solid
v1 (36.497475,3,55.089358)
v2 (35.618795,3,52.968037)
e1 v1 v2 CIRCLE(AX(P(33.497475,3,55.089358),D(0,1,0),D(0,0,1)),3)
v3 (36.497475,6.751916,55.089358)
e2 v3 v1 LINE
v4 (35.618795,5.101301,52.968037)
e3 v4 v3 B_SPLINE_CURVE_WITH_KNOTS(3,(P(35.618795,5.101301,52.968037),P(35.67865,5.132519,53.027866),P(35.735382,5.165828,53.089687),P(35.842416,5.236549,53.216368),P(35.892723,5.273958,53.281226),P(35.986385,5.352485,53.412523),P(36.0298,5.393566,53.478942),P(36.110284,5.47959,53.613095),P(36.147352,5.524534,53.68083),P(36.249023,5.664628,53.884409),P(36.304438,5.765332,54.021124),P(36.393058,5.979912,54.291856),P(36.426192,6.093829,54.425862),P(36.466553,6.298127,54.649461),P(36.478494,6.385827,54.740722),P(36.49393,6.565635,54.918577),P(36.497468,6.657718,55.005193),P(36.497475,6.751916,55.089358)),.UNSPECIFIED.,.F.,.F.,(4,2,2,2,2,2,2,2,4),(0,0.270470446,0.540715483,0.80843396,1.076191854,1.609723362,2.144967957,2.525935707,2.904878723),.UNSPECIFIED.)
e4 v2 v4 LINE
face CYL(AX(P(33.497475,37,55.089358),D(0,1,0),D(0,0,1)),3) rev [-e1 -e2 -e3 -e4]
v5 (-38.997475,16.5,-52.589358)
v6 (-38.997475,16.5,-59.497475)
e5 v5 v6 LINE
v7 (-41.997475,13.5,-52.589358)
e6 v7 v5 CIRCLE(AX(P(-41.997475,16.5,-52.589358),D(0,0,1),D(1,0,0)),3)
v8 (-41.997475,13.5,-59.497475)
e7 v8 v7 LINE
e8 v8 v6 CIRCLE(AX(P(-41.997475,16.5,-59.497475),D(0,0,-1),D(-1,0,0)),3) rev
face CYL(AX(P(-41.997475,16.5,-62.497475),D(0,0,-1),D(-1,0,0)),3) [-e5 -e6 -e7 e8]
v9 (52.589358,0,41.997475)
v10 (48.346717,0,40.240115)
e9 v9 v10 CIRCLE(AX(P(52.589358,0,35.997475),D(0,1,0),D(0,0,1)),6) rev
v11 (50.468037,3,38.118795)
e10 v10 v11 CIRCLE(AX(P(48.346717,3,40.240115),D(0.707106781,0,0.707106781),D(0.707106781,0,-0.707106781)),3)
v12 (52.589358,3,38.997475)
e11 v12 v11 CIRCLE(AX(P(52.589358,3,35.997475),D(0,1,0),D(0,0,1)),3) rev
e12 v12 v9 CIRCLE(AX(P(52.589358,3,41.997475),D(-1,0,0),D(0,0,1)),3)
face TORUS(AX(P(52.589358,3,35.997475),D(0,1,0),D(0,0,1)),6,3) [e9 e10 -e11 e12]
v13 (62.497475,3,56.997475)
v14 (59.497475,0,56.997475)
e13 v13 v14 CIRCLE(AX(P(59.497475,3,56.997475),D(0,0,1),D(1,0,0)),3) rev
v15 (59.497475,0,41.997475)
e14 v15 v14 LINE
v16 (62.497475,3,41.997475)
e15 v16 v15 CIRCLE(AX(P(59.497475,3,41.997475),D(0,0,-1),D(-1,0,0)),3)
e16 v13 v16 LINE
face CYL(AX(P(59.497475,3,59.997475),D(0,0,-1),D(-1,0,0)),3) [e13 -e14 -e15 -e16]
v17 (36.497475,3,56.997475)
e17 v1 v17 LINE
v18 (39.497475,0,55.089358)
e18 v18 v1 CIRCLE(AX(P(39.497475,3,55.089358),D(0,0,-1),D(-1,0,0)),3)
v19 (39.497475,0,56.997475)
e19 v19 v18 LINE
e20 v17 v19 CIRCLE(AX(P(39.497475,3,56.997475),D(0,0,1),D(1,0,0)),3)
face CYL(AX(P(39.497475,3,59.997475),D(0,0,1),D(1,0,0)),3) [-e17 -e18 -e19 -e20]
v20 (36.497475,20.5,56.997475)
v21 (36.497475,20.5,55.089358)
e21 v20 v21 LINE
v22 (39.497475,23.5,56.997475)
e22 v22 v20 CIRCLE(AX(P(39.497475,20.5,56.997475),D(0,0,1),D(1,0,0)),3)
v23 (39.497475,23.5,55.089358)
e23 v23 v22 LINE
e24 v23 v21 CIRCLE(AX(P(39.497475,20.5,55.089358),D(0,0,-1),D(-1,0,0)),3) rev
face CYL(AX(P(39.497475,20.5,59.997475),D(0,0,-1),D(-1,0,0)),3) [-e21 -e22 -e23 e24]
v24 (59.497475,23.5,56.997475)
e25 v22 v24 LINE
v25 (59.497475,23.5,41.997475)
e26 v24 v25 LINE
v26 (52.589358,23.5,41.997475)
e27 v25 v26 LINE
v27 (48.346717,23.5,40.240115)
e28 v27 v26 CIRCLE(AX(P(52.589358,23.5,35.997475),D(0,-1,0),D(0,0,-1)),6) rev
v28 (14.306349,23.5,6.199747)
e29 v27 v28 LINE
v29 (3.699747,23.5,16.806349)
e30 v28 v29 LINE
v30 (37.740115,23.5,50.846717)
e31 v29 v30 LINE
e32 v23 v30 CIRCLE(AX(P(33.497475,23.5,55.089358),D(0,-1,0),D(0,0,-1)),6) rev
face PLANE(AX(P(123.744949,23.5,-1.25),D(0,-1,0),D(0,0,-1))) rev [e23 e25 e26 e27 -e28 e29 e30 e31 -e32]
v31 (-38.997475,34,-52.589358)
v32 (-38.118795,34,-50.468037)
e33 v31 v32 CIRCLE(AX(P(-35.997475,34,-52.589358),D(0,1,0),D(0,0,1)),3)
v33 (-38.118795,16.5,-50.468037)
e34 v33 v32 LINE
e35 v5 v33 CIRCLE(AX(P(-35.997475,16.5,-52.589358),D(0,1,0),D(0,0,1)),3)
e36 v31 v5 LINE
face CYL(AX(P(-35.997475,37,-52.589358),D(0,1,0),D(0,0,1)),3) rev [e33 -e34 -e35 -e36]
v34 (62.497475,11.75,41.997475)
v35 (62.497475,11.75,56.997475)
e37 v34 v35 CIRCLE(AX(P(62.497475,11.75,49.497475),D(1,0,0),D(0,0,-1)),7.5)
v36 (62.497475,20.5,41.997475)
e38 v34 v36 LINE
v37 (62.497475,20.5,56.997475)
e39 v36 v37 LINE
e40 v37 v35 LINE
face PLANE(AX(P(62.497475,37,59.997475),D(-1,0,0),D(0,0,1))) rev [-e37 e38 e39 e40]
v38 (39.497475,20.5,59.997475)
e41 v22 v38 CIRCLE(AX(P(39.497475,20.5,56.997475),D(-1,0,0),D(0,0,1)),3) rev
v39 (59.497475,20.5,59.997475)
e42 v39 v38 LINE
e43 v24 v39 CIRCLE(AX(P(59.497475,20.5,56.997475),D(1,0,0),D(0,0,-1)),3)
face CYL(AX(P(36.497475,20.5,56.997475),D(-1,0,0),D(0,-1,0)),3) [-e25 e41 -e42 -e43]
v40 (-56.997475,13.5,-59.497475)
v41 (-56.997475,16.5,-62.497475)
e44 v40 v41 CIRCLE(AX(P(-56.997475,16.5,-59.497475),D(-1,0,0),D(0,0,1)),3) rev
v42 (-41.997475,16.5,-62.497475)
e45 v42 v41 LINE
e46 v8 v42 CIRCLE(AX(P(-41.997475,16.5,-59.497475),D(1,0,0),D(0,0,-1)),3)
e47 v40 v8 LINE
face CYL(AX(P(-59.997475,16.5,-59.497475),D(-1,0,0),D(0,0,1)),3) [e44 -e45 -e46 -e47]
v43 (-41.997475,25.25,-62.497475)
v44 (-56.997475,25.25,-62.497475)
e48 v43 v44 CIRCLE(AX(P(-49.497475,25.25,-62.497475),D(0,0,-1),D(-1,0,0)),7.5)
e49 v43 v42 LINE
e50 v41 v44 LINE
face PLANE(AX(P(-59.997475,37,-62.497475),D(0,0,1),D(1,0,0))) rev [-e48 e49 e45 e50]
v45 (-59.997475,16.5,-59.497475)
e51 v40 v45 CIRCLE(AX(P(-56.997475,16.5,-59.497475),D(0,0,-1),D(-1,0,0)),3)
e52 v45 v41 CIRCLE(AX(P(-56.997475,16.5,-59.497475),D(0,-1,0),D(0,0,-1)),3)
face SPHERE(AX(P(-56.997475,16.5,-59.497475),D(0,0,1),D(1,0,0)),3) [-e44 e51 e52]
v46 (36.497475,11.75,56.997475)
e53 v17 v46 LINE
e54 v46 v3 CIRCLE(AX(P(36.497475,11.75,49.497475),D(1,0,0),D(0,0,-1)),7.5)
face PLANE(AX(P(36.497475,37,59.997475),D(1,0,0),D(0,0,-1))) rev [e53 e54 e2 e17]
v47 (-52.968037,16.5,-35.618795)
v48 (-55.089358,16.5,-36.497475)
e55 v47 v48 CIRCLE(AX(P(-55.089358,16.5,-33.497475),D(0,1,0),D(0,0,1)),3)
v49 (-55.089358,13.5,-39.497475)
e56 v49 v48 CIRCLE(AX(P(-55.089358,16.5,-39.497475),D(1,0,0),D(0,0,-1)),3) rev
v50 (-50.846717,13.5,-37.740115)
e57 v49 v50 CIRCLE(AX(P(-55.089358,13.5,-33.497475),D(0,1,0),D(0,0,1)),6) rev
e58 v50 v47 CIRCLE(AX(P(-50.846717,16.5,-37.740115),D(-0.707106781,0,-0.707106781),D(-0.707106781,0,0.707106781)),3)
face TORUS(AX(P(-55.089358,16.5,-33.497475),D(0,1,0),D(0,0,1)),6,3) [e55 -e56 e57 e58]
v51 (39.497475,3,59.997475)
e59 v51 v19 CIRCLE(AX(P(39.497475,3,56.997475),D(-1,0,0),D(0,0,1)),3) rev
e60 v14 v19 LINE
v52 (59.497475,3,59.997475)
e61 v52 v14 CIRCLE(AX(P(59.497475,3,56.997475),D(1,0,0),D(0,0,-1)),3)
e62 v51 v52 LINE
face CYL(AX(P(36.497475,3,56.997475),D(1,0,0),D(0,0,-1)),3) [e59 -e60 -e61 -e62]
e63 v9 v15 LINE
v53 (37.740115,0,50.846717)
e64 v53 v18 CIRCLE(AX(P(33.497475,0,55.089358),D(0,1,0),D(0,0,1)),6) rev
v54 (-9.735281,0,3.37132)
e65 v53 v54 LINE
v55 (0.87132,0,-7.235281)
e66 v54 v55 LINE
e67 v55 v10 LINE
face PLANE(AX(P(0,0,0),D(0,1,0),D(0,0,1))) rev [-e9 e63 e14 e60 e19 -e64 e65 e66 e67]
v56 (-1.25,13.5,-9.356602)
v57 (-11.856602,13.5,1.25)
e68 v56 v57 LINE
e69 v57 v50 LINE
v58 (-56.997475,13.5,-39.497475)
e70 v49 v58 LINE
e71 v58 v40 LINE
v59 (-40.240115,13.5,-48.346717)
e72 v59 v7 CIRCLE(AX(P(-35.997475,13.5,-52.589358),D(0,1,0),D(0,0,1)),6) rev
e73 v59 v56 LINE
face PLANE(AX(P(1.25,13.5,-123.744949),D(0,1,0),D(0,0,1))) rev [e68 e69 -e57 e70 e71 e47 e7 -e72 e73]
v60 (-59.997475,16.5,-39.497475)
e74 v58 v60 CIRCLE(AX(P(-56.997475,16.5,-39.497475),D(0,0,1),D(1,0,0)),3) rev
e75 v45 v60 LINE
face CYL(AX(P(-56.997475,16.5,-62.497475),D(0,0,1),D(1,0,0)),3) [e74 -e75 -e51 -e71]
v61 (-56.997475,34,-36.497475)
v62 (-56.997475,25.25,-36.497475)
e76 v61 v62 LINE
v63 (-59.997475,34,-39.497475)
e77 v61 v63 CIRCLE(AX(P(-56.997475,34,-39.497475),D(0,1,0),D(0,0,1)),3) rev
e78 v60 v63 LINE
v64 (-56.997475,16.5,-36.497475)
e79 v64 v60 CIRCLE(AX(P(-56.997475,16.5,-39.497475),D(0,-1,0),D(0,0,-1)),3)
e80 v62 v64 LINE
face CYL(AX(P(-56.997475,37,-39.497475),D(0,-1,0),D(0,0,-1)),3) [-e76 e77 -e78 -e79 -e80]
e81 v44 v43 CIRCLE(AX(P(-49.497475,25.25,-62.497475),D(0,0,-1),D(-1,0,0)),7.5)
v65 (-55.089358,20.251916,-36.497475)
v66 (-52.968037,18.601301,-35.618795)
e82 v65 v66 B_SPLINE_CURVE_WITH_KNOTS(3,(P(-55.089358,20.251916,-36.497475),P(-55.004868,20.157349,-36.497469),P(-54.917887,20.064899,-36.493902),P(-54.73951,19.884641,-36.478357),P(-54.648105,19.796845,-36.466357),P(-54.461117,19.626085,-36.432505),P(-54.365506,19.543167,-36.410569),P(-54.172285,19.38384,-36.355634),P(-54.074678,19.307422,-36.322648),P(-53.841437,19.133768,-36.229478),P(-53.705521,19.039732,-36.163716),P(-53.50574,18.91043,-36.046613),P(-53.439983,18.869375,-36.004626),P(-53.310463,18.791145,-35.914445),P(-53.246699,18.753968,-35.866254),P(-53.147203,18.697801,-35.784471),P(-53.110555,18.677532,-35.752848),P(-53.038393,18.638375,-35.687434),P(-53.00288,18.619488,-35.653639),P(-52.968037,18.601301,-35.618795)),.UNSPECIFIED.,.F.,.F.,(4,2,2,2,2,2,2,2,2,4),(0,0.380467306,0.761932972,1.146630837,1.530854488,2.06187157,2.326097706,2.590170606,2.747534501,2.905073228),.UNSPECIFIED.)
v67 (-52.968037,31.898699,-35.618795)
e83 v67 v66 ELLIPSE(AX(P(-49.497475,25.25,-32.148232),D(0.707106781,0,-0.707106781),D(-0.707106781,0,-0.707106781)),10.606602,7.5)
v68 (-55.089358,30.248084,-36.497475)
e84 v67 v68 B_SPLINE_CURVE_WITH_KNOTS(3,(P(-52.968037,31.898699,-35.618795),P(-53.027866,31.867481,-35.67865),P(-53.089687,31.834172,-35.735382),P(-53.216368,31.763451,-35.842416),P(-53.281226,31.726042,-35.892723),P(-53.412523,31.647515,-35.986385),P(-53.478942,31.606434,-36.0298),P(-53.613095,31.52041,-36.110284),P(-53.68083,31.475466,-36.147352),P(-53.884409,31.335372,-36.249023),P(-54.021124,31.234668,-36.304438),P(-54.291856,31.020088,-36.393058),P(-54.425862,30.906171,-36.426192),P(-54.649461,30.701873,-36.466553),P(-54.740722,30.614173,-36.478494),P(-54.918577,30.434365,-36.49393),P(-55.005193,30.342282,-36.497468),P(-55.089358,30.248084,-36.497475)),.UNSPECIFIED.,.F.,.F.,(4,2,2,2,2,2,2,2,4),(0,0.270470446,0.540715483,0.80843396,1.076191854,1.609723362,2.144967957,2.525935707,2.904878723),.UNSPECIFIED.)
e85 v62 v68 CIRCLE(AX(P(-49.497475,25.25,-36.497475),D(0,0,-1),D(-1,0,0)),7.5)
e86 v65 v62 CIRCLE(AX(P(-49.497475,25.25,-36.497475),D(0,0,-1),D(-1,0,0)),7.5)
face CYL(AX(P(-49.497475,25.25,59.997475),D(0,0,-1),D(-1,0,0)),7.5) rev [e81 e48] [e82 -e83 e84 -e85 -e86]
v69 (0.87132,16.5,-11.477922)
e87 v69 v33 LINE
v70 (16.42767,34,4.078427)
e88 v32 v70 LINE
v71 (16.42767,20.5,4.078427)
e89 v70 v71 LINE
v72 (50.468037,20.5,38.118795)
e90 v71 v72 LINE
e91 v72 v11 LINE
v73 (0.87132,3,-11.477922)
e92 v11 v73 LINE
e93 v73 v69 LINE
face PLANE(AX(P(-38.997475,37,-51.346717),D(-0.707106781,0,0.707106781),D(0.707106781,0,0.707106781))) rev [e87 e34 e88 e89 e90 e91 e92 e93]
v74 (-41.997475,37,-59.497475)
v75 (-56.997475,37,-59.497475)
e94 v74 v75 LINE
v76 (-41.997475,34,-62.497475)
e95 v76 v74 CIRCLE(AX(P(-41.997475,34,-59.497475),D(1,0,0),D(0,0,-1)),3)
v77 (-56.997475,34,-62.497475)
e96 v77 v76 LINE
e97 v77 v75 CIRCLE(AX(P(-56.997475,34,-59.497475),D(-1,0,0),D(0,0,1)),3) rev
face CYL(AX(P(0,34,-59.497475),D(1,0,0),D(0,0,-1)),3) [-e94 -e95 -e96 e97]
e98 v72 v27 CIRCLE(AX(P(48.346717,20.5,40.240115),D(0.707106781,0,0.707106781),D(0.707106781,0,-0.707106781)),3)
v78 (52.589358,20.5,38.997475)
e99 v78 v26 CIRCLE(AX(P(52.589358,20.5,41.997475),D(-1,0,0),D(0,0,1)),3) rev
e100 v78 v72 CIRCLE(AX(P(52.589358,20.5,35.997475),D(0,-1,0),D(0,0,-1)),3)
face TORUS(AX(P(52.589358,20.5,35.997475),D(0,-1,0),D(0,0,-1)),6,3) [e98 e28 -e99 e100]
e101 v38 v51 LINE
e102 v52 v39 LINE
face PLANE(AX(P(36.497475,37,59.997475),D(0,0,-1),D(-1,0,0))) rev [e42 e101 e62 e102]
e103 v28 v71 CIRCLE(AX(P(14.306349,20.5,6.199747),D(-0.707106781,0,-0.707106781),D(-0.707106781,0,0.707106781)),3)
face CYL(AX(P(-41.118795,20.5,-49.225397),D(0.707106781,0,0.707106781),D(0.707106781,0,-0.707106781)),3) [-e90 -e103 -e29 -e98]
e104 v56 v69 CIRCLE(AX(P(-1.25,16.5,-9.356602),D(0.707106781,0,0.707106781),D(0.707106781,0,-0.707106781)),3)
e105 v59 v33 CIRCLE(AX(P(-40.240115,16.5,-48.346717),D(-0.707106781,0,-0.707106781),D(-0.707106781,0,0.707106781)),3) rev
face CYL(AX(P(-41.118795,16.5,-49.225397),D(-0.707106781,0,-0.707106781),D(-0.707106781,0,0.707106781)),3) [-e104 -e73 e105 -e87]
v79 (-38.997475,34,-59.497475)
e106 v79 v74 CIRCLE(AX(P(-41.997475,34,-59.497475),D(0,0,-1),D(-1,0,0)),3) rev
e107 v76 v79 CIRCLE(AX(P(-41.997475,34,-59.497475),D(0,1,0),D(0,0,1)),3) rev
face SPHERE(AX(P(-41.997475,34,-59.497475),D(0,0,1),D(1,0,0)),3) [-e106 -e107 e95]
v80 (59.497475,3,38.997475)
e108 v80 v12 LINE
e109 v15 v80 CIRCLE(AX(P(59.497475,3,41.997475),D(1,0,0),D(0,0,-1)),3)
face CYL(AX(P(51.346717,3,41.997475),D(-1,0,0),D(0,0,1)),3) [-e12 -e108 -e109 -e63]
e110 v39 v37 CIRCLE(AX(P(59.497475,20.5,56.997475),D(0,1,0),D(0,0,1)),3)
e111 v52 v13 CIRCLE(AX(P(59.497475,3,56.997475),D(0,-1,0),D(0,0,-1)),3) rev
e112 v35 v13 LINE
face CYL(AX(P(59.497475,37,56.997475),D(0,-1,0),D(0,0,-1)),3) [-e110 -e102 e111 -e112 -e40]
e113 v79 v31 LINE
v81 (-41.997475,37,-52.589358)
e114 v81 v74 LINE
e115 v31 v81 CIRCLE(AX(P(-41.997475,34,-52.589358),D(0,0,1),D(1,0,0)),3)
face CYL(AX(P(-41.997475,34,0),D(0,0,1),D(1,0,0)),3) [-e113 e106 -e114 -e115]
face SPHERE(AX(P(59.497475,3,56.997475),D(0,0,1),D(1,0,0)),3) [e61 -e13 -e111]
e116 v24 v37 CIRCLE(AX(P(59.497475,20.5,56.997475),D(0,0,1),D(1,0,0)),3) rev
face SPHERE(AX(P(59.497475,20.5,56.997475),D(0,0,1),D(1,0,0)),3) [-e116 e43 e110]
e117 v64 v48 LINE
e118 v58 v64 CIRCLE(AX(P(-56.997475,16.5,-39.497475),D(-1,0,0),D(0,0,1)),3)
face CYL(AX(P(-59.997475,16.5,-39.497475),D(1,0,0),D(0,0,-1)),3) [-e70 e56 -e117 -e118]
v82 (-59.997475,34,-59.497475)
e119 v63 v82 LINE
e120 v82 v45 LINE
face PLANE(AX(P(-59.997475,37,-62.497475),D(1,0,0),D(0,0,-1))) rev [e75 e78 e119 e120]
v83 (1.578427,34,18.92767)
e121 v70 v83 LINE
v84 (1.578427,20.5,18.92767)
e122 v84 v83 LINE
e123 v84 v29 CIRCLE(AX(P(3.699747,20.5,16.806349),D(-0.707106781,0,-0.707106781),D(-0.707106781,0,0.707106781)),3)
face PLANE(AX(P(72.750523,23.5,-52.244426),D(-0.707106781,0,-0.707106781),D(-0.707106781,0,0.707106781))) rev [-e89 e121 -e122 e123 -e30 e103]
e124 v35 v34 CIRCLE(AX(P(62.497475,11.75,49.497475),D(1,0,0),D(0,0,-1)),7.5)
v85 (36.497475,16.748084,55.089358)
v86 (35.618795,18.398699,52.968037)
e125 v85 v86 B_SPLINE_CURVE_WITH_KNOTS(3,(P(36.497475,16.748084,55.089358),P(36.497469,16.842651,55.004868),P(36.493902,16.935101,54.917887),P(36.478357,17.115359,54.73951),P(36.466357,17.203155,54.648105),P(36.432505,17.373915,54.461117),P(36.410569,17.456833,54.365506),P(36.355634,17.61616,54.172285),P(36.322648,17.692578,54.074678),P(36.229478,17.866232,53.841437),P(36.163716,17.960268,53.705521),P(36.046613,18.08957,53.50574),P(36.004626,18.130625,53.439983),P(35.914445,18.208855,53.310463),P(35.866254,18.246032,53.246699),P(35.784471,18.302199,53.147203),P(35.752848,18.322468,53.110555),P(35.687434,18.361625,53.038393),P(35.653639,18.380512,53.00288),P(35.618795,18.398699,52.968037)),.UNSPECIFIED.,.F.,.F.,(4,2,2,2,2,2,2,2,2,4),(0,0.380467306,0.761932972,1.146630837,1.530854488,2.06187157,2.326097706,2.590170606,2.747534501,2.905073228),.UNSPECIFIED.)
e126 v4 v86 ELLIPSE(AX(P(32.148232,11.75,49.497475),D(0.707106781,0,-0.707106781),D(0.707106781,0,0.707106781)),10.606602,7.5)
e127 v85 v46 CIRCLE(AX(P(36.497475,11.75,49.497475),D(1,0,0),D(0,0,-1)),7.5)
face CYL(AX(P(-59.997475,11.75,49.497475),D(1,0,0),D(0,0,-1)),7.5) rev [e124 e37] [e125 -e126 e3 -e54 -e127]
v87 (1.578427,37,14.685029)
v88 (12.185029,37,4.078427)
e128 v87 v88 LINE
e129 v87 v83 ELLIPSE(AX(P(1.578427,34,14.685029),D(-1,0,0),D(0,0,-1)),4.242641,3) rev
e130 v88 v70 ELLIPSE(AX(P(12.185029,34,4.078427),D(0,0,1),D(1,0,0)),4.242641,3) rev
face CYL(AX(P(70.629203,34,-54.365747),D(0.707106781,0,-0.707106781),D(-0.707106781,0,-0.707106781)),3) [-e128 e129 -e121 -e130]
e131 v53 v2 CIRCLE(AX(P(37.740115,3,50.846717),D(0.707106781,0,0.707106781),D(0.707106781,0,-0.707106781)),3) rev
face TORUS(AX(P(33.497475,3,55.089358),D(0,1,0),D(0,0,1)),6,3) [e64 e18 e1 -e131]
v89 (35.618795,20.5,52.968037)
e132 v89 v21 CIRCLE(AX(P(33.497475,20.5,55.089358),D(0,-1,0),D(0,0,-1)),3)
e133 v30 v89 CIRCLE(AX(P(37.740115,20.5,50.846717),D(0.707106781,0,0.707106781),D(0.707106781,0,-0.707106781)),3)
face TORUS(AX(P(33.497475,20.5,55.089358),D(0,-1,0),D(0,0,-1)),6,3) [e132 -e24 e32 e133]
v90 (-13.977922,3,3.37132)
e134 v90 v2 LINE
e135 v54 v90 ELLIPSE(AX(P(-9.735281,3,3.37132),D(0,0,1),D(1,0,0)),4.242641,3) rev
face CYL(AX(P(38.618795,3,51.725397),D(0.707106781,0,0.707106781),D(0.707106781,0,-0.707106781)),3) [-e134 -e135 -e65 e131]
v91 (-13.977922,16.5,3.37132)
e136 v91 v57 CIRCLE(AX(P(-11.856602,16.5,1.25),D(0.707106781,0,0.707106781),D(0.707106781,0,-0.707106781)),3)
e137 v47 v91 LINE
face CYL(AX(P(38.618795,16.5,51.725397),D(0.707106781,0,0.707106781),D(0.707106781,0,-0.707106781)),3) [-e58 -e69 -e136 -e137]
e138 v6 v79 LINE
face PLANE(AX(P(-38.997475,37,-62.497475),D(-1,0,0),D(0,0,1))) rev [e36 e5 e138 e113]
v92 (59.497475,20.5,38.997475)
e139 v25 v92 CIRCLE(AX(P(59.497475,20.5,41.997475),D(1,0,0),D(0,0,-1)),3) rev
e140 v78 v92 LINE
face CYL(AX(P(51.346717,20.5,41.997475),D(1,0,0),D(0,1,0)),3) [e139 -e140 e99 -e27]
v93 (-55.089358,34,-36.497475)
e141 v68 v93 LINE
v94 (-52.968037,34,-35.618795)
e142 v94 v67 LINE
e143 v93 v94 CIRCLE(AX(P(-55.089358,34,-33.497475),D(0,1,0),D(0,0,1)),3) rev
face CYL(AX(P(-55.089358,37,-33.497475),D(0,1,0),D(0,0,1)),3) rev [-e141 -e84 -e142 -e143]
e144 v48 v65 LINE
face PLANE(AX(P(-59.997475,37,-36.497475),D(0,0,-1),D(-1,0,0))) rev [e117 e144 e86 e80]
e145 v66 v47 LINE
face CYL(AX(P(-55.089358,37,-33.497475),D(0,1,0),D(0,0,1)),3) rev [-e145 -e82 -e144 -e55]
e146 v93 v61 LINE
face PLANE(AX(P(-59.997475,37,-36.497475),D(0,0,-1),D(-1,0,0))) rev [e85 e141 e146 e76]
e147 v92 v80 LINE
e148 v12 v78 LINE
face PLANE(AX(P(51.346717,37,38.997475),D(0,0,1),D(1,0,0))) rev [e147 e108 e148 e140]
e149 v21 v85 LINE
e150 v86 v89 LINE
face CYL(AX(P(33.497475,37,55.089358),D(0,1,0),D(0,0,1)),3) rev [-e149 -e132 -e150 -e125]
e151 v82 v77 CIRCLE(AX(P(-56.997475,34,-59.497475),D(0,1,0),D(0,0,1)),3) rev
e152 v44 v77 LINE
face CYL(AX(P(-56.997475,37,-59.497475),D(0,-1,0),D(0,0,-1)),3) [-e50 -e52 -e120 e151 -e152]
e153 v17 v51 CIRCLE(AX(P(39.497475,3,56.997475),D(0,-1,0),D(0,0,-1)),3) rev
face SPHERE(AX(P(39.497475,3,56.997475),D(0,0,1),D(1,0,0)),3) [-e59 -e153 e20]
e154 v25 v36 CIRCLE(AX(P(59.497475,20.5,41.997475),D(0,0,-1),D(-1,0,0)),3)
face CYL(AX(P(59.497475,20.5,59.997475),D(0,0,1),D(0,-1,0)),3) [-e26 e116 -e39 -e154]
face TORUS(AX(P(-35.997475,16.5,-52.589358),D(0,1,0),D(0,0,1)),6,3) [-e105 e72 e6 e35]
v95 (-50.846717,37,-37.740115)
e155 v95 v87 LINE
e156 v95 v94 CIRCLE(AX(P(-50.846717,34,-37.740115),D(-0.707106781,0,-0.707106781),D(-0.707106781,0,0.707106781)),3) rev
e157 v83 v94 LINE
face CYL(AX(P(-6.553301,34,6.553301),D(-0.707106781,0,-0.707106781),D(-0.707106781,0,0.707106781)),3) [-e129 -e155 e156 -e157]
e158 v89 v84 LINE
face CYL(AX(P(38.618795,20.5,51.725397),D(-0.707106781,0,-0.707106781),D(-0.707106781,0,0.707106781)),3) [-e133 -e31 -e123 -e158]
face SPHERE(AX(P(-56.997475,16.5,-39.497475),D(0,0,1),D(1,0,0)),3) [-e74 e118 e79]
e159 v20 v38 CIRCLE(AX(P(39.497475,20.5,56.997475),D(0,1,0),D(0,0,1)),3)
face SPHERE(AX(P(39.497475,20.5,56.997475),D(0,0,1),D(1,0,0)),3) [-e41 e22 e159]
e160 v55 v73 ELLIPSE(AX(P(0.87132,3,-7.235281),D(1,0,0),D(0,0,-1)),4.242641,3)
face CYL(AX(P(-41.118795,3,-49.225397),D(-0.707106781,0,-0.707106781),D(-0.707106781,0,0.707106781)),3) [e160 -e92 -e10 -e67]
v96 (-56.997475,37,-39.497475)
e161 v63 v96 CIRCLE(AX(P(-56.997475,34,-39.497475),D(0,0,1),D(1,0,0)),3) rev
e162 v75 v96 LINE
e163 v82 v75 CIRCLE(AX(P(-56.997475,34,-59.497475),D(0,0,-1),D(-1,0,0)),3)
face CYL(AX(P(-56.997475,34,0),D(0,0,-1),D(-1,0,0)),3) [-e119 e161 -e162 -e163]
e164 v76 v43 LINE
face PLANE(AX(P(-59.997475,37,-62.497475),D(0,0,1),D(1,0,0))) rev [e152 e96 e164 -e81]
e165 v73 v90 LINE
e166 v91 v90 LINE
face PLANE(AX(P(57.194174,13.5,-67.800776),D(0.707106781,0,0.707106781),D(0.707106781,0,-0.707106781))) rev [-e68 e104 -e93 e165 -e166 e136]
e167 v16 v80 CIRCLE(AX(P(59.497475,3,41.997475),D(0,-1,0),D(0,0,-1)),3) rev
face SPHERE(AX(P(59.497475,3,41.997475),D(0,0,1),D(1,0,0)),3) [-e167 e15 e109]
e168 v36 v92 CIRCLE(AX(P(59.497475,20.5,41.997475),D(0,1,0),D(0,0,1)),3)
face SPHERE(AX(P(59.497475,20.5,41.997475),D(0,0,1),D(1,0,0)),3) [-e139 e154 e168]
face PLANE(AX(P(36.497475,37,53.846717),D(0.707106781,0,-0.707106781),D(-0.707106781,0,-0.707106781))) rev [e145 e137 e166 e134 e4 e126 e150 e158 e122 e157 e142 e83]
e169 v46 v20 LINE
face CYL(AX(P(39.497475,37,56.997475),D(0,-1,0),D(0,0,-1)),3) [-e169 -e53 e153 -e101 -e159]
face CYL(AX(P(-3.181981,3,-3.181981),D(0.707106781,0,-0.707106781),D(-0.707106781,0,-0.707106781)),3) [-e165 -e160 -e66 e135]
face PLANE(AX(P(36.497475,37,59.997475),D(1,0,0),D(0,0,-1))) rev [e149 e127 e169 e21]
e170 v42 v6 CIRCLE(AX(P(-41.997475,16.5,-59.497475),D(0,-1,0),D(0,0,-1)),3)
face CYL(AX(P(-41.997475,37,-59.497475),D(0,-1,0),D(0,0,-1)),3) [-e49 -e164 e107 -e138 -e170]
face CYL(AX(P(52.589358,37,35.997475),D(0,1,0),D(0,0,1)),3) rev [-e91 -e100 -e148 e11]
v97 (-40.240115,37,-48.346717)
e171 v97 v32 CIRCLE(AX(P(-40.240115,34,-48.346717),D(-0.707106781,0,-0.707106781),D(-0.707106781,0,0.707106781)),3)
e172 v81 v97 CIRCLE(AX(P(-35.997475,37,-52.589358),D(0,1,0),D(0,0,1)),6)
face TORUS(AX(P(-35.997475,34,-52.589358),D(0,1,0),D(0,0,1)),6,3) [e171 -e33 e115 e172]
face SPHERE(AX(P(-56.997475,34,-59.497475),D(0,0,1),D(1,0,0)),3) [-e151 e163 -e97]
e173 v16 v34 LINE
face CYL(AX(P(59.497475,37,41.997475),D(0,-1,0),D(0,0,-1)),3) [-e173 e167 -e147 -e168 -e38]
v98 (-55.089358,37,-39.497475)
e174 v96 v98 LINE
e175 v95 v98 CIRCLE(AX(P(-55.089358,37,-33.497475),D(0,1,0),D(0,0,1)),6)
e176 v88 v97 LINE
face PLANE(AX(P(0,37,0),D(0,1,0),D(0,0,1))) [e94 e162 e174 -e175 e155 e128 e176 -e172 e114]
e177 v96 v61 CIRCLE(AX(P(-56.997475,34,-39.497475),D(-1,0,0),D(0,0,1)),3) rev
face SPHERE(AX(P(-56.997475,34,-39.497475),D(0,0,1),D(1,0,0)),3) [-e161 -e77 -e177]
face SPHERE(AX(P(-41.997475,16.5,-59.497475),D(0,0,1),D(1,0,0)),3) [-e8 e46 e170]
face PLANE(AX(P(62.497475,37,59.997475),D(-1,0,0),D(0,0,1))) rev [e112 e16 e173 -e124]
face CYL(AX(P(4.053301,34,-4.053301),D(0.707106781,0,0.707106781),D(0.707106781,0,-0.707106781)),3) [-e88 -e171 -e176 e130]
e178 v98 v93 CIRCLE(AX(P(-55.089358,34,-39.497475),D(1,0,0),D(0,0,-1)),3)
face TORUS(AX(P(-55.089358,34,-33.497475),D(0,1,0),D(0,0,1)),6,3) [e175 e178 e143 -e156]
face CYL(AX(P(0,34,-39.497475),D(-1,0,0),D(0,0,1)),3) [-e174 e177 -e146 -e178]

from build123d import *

# Parameters (mm, degrees)
BOSS_EXTRUDE1_DEPTH     = 37
CUT_EXTRUDE1_DEPTH      = 101.656930314
CUT_EXTRUDE1_DEPTH_BACK = 101.656930314
SKETCH6_R               = 7.5
CUT_EXTRUDE2_DEPTH      = 143.407678732
SKETCH7_R               = 7.5
CUT_EXTRUDE3_DEPTH      = 143.407678732
FILLET1_R               = 3


with BuildPart() as part:
    # Sketch3 → Boss-Extrude1 (new body)
    with BuildSketch(Plane(origin=(0, 0, 0), x_dir=(1, 0, 0), z_dir=(0, 1, 0))):
        Polygon((-59.997474683, 62.497474683), (-38.997474683, 62.497474683), (-38.997474683, 51.346717088), (51.346717088, -38.997474683), (62.497474683, -38.997474683), (62.497474683, -59.997474683), (36.497474683, -59.997474683), (36.497474683, -53.846717088), (-53.846717088, 36.497474683), (-59.997474683, 36.497474683), align=None)
    extrude(amount=BOSS_EXTRUDE1_DEPTH)

    # Sketch5 → Cut-Extrude1 (cut, two sides: drawn at the far end of the back side and taken through both)
    with BuildSketch(Plane(origin=(7.806349186, 0, -4.542893219), x_dir=(0.7071067811865459, 0, 0.7071067811865491), z_dir=(-0.7071067811865491, 0, 0.7071067811865459)).offset(-CUT_EXTRUDE1_DEPTH_BACK)):
        Polygon((61.575378798, 37), (12.192388155, 37), (12.192388155, 23.5), (84.309397513, 23.5), (84.309397513, 37), (69.460155108, 37), align=None)
        Polygon((-9.807611845, 0), (-66.190602487, 0), (-74.075378798, 0), (-88.924621202, 0), (-88.924621202, 13.5), (-9.807611845, 13.5), align=None)
    extrude(amount=CUT_EXTRUDE1_DEPTH + CUT_EXTRUDE1_DEPTH_BACK, mode=Mode.SUBTRACT)

    # Sketch6 → Cut-Extrude2 (cut, through all)
    with BuildSketch(Plane(origin=(62.497474683, 0, 0), x_dir=(0, 0, -1), z_dir=(1, 0, 0))):
        with Locations((-49.497474683, 11.75)):
            Circle(SKETCH6_R)
    extrude(amount=-CUT_EXTRUDE2_DEPTH, mode=Mode.SUBTRACT)

    # Sketch7 → Cut-Extrude3 (cut, through all)
    with BuildSketch(Plane(origin=(0, 0, -62.497474683), x_dir=(-1, 0, 0), z_dir=(0, 0, -1))):
        with Locations((49.497474683, 25.25)):
            Circle(SKETCH7_R)
    extrude(amount=-CUT_EXTRUDE3_DEPTH, mode=Mode.SUBTRACT)

    # Fillet1
    fillet1_edges = [part.edges().sort_by_distance(p)[0] for p in [
        (56.922095886, 0, 38.997474683),
        (56.922095886, 23.5, 38.997474683),
        (-38.997474683, 25.25, -51.346717088),
        (26.109018716, 0, 13.759776311),
        (51.346717088, 11.75, 38.997474683),
        (33.887193309, 23.5, 21.537950904),
        (62.497474683, 0, 49.497474683),
        (62.497474683, 11.75, 59.997474683),
        (62.497474683, 23.5, 49.497474683),
        (62.497474683, 11.75, 38.997474683),
        (-6.553300859, 0, -4.053300859),
        (-33.912319575, 13.5, -16.56307717),
        (-19.06307717, 13.5, -31.412319575),
        (-38.997474683, 13.5, -56.922095886),
        (-56.922095886, 13.5, -36.497474683),
        (-59.997474683, 25.25, -36.497474683),
        (-59.997474683, 13.5, -49.497474683),
        (-59.997474683, 25.25, -62.497474683),
        (-49.497474683, 13.5, -62.497474683),
        (-38.997474683, 25.25, -62.497474683),
        (-26.134144982, 37, -8.784902577),
        (-56.922095886, 37, -36.497474683),
        (-59.997474683, 37, -49.497474683),
        (-49.497474683, 37, -62.497474683),
        (-38.997474683, 37, -56.922095886),
        (-11.284902577, 37, -23.634144982),
        (9.003048327, 37, 11.503048327),
        (19.037950904, 23.5, 36.387193309),
        (11.259776311, 0, 28.609018716),
        (49.497474683, 0, 59.997474683),
        (49.497474683, 23.5, 59.997474683),
        (36.497474683, 11.75, 59.997474683),
        (36.497474683, 0, 56.922095886),
        (-53.846717088, 16.319918557, -36.497474683),
        (-53.846717088, 34.180081443, -36.497474683),
        (36.497474683, 20.680081443, 53.846717088),
        (36.497474683, 2.819918557, 53.846717088),
        (36.497474683, 23.5, 56.922095886),
    ]]
    fillet(fillet1_edges, radius=FILLET1_R - 0.0001)  # a hair under: the kernel refuses the full size


solid = part.part
